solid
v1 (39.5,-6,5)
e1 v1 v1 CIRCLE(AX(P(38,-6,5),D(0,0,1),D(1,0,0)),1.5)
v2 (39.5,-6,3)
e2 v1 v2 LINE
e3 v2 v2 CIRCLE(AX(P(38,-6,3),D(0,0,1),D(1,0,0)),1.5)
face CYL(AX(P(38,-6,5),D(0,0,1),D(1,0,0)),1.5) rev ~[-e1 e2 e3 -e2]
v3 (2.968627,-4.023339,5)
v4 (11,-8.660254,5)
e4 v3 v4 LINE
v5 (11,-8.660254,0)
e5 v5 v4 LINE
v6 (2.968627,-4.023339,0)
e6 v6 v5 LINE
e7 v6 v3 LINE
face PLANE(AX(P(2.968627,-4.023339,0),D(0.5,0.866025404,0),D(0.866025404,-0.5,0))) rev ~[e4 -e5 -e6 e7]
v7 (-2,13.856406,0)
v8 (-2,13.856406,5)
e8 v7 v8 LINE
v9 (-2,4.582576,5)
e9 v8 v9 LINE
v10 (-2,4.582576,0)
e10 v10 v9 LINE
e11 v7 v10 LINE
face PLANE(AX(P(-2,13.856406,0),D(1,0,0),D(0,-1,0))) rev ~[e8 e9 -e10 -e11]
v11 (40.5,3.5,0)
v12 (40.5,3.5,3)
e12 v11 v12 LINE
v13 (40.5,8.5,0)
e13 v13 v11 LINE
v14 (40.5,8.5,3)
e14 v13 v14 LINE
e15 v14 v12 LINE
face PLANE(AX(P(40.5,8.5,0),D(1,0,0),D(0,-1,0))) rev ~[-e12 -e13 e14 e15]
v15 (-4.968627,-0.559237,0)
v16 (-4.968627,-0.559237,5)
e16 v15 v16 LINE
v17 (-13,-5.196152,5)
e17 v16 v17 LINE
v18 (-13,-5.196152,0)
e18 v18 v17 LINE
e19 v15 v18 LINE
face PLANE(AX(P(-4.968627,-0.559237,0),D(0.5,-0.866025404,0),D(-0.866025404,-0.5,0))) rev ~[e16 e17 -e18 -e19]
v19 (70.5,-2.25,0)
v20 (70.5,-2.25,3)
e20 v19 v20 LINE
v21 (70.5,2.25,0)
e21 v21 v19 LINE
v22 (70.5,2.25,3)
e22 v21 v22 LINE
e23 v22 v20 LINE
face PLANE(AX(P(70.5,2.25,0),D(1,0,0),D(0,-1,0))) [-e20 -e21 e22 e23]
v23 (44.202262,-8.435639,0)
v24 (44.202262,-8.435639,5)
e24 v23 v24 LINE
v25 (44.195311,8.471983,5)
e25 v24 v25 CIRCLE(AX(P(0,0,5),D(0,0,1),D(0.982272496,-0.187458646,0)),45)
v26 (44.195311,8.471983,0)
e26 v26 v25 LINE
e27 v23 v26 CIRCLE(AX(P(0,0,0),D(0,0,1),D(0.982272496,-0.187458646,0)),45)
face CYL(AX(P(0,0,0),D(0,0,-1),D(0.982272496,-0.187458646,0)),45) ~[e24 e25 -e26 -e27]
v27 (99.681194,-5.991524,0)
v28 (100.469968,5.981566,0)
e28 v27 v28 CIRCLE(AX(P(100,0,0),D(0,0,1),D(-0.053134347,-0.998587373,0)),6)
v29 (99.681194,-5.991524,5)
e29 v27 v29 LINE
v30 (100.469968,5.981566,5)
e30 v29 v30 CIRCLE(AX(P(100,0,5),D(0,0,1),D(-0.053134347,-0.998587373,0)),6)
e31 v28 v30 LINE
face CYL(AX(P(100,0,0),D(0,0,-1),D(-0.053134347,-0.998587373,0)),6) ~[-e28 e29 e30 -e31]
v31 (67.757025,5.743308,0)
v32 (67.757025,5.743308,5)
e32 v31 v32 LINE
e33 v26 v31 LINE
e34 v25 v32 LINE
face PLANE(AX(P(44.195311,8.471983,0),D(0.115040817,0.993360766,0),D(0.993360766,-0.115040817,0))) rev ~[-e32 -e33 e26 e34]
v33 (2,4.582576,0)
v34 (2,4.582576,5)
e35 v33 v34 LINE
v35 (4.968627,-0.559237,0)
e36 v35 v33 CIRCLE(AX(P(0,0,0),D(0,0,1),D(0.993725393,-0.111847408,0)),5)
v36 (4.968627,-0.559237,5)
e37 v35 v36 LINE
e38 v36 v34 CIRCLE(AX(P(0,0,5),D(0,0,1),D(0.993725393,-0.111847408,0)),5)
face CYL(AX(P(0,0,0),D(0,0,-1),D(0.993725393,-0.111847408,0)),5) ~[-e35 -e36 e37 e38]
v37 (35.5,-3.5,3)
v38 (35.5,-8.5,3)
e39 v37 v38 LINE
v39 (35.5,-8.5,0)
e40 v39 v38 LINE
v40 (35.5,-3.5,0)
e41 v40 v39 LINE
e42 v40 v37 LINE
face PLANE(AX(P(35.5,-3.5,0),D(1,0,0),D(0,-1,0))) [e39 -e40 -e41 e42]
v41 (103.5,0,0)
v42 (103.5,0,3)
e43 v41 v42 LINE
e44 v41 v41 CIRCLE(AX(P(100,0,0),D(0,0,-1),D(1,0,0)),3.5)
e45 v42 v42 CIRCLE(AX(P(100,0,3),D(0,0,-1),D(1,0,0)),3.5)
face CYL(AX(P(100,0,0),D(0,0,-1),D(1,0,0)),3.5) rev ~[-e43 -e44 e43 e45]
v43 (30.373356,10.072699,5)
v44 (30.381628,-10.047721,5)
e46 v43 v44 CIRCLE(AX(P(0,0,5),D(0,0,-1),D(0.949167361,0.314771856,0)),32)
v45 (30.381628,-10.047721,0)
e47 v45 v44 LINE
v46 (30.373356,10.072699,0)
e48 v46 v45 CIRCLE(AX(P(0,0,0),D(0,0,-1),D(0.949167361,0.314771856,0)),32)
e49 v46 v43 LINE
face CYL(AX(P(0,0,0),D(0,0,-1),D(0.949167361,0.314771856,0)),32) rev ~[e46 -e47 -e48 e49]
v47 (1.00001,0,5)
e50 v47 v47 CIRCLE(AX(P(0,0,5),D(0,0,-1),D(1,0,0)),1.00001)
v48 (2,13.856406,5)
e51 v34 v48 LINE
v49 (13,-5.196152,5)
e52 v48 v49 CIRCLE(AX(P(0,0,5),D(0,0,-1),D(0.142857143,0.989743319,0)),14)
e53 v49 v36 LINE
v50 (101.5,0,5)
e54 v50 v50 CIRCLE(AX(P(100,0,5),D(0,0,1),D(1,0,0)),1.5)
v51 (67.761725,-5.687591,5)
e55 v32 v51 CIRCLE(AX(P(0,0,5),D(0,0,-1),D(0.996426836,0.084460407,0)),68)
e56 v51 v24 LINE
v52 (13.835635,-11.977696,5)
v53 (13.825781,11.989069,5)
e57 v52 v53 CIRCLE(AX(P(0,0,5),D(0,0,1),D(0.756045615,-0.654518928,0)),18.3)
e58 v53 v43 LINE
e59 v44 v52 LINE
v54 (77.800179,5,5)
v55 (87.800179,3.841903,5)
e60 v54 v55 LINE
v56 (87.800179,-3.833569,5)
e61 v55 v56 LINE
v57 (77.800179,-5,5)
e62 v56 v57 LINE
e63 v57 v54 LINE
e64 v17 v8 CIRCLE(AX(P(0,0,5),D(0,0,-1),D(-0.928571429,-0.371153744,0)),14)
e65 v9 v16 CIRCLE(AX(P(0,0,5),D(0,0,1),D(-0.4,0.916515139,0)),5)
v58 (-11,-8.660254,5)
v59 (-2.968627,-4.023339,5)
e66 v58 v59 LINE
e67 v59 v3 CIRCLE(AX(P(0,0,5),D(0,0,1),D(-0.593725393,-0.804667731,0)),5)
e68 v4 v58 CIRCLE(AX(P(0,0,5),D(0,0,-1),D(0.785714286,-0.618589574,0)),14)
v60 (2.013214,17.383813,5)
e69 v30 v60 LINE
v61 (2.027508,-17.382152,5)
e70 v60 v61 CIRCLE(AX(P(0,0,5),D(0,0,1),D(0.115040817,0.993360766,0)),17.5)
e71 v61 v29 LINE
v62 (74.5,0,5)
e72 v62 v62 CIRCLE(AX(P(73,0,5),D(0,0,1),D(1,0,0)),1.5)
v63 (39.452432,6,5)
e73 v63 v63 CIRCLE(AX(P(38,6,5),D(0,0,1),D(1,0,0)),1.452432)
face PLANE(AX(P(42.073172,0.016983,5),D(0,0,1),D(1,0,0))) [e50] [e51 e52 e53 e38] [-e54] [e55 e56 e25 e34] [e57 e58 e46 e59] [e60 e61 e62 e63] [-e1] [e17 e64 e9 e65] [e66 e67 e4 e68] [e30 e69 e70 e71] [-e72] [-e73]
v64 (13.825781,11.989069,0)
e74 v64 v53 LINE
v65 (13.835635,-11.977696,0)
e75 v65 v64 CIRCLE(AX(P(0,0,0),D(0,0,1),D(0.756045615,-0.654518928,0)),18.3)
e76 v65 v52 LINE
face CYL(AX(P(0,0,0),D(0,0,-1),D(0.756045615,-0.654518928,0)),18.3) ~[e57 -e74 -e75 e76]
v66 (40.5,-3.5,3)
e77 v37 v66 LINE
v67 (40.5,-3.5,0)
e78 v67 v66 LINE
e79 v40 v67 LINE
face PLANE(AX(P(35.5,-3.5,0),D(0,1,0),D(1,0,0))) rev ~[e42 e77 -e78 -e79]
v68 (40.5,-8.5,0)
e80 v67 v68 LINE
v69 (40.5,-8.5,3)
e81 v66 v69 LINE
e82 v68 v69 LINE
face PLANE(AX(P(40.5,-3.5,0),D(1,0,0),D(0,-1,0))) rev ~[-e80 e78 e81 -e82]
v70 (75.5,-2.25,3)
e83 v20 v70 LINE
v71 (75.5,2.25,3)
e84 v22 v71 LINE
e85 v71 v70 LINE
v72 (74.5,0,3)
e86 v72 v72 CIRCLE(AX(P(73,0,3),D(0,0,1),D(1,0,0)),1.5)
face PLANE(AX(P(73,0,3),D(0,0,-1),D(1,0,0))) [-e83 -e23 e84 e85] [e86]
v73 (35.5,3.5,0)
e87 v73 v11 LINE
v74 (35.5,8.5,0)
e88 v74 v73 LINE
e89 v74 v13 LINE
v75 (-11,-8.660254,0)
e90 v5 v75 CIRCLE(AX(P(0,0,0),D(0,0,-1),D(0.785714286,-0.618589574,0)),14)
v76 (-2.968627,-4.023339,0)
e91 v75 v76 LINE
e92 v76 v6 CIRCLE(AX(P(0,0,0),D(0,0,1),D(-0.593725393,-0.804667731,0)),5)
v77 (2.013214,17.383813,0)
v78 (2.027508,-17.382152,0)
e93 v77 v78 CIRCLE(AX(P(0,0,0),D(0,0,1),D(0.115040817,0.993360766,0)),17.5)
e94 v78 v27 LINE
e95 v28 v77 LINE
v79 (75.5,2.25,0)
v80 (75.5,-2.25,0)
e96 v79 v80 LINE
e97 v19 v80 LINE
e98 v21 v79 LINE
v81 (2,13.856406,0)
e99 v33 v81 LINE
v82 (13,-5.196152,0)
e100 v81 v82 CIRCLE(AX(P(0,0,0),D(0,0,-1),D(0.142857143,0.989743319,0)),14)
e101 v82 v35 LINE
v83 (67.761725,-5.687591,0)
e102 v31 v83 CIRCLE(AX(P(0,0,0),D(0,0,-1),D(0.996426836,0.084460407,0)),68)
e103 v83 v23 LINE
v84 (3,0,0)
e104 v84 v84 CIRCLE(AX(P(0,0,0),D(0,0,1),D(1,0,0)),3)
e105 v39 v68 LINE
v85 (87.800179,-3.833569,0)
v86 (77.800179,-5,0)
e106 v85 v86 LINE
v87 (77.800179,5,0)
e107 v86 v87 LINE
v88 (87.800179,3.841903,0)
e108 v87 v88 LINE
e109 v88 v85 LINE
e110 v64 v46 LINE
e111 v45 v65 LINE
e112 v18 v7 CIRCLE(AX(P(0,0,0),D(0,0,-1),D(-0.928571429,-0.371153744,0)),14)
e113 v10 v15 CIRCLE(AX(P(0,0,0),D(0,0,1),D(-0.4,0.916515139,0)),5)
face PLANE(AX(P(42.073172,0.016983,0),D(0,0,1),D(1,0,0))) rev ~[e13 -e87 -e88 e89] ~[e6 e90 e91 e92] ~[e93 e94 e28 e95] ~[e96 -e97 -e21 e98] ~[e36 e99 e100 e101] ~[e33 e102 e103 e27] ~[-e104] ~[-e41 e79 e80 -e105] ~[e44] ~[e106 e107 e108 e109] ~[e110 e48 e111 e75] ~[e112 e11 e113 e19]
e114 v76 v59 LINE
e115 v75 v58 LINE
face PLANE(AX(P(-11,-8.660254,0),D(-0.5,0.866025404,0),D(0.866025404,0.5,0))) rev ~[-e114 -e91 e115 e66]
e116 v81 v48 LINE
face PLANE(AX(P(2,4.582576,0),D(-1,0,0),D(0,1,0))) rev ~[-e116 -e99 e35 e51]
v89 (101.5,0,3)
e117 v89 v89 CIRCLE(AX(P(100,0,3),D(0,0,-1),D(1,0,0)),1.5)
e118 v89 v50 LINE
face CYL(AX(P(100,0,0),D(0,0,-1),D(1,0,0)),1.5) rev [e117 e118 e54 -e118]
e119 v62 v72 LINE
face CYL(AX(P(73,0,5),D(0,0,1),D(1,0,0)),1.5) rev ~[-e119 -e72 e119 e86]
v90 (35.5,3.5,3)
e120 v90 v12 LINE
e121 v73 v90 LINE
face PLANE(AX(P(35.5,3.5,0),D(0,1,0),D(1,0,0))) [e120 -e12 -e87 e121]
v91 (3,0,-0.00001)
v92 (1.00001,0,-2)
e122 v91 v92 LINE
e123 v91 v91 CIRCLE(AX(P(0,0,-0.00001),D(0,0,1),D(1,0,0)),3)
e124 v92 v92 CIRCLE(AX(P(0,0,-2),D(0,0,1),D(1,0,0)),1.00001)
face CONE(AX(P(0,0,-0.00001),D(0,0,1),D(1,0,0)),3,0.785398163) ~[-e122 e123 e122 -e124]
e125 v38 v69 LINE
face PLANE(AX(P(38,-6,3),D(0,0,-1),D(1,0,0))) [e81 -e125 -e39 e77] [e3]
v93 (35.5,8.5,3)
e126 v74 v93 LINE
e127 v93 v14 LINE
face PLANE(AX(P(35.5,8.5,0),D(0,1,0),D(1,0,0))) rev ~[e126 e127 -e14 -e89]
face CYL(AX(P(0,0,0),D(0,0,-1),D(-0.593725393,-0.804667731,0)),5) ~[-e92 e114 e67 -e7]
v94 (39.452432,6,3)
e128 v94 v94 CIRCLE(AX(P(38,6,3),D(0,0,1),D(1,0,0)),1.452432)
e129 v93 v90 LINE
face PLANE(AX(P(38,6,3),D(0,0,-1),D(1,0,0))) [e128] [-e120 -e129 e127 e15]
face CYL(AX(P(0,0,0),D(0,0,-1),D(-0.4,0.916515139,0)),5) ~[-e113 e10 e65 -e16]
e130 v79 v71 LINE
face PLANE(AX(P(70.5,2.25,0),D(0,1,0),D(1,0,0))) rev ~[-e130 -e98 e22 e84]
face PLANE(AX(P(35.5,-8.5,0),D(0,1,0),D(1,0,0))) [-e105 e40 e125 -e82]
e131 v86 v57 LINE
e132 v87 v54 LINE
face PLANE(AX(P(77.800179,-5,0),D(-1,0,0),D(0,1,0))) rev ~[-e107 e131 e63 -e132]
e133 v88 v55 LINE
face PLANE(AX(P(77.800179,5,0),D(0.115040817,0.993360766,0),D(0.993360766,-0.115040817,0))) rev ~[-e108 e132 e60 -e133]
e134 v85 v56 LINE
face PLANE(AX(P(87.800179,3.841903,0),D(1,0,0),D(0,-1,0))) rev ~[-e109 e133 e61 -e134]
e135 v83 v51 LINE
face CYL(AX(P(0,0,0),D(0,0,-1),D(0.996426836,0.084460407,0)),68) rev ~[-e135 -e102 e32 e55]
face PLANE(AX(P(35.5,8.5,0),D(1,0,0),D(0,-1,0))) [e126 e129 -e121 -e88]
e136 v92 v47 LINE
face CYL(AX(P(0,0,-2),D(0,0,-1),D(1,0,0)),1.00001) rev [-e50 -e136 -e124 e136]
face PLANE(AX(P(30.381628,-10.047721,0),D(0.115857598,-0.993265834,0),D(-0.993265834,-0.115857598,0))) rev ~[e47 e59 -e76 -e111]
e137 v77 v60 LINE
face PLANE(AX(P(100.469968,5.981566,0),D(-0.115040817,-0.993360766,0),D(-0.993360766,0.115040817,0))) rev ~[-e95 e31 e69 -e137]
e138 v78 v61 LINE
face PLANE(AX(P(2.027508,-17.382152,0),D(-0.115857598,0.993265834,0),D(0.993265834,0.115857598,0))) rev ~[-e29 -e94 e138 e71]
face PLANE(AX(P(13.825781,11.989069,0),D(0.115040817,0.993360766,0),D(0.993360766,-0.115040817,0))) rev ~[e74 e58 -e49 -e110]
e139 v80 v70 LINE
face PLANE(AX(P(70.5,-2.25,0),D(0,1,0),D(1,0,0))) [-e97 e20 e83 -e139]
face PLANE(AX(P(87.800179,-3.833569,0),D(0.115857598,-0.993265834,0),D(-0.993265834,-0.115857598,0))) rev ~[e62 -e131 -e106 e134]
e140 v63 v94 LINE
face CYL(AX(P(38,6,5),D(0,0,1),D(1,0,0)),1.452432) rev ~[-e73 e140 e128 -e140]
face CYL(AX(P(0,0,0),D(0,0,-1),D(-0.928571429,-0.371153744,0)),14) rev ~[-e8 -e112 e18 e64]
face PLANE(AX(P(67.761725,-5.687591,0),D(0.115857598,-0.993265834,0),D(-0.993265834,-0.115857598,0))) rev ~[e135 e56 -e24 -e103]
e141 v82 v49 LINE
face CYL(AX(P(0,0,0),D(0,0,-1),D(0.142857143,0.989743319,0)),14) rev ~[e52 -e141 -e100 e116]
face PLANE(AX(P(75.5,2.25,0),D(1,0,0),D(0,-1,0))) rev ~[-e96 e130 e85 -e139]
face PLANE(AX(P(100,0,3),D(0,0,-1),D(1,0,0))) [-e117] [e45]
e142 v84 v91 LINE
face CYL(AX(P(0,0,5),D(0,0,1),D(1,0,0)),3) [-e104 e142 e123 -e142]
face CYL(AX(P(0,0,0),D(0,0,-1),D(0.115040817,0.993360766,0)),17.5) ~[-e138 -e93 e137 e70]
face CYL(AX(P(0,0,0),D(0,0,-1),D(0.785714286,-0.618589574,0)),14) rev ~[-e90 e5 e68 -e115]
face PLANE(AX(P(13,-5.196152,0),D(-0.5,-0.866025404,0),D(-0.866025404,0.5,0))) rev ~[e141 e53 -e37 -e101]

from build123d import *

# Parameters (mm, degrees)
F0_R     = 1.5
F1_DEPTH = 5
F2_W     = 5
F2_H     = 5
F2_H_2   = 4.5
F2_R     = 3.5
F3_DEPTH = 3
F4_R     = 1.5
F4_R_2   = 1.4524317573
F5_DEPTH = 25
F6_R     = 3
F7_DEPTH = 7
F8_SIZE  = 1.99999
F9_DEPTH = 25


# Not quite as in the source:
# - a fillet or chamfer is up to 0.001 mm smaller than in the source, because OpenCascade refuses the exact size


with BuildPart() as f1:
    # F0 (on Top) → F1 (new body)
    with BuildSketch(Plane.XY):
        with BuildLine():
            Line((100.4699678509, 5.9815658668), (2.0132142916, 17.3838133968))
            ThreePointArc((2.0132142916, 17.3838133968), (-17.4999985209, -0.0071949455), (2.027507963, -17.3821520952))
            Line((2.027507963, -17.3821520952), (99.6811939192, -5.991524237))
            ThreePointArc((99.6811939192, -5.991524237), (105.987022142, -0.394418396), (100.4699678509, 5.9815658668))
        make_face()
        with BuildLine():
            Line((-11, -8.6602540378), (-2.9686269666, -4.023338655))
            ThreePointArc((-2.9686269666, -4.023338655), (0, -5), (2.9686269666, -4.023338655))
            Line((2.9686269666, -4.023338655), (11, -8.6602540378))
            ThreePointArc((11, -8.6602540378), (0, -14), (-11, -8.6602540378))
        make_face(mode=Mode.SUBTRACT)
        with BuildLine():
            ThreePointArc((-13, -5.1961524227), (-12.124355653, 7), (-2, 13.8564064606))
            Line((-2, 13.8564064606), (-2, 4.582575695))
            ThreePointArc((-2, 4.582575695), (-4.3301270189, 2.5), (-4.9686269666, -0.5592370399))
            Line((-4.9686269666, -0.5592370399), (-13, -5.1961524227))
        make_face(mode=Mode.SUBTRACT)
        Circle(F0_R, mode=Mode.SUBTRACT)
        with BuildLine():
            Line((2, 4.582575695), (2, 13.8564064606))
            ThreePointArc((2, 13.8564064606), (12.124355653, 7), (13, -5.1961524227))
            Line((13, -5.1961524227), (4.9686269666, -0.5592370399))
            ThreePointArc((4.9686269666, -0.5592370399), (4.3301270189, 2.5), (2, 4.582575695))
        make_face(mode=Mode.SUBTRACT)
        with BuildLine():
            Line((30.3816278502, -10.0477205958), (13.8356347618, -11.9776963869))
            ThreePointArc((13.8356347618, -11.9776963869), (18.2999984533, 0.0075238573), (13.8257810711, 11.9890690954))
            Line((13.8257810711, 11.9890690954), (30.3733555452, 10.0726993863))
            ThreePointArc((30.3733555452, 10.0726993863), (31.9999972954, 0.0131564719), (30.3816278502, -10.0477205958))
        make_face(mode=Mode.SUBTRACT)
        with BuildLine():
            Line((67.7617245486, -5.6875905441), (44.2022623135, -8.435639061))
            ThreePointArc((44.2022623135, -8.435639061), (44.9999961967, 0.0185012885), (44.1953109176, 8.4719828198))
            Line((44.1953109176, 8.4719828198), (67.7570248516, 5.743307693))
            ThreePointArc((67.7570248516, 5.743307693), (67.9999942528, 0.0279575027), (67.7617245486, -5.6875905441))
        make_face(mode=Mode.SUBTRACT)
        Polygon((77.8001793809, -5), (77.8001793809, 5), (87.8001793809, 3.8419029556), (87.8001793809, -3.8335690817), align=None, mode=Mode.SUBTRACT)
        with Locations((100, 0)):
            Circle(F0_R, mode=Mode.SUBTRACT)
    extrude(amount=F1_DEPTH)

    # F2 (on face) → F3 (cut)
    with BuildSketch(Plane(origin=(0, 0, 0), x_dir=(1, 0, 0), z_dir=(0, 0, -1))):
        with Locations((38, 6)):
            Rectangle(F2_W, F2_H)
        with Locations((73, 0)):
            Rectangle(F2_W, F2_H_2)
        with Locations((38, -6)):
            Rectangle(F2_W, F2_H)
        with Locations((100, 0)):
            Circle(F2_R)
    extrude(amount=-F3_DEPTH, mode=Mode.SUBTRACT)

    # F4 (on face) → F5 (cut)
    with BuildSketch(Plane.XY.offset(5)):
        with Locations((38, -6)):
            Circle(F4_R)
        with Locations((73, 0)):
            Circle(F4_R)
        with Locations((38, 6)):
            Circle(F4_R_2)
    extrude(amount=-F5_DEPTH, mode=Mode.SUBTRACT)

    # F6 (on face) → F7 (join)
    with BuildSketch(Plane.XY.offset(5)):
        Circle(F6_R)
    extrude(amount=-F7_DEPTH)

    # F8 (size 2 in the source; OpenCascade refuses exactly that, so slightly less here)
    f8_edges = [f1.edges().sort_by_distance(p)[0] for p in [
        (-3, 0, -2),
    ]]
    chamfer(f8_edges, length=F8_SIZE)

    # F9 (cut): a face of the model
    f9_faces = [f1.faces().sort_by_distance(p)[0] for p in [
        (0, 0, -2),
    ]]
    extrude(f9_faces, amount=-F9_DEPTH, mode=Mode.SUBTRACT)


solid = f1.part
